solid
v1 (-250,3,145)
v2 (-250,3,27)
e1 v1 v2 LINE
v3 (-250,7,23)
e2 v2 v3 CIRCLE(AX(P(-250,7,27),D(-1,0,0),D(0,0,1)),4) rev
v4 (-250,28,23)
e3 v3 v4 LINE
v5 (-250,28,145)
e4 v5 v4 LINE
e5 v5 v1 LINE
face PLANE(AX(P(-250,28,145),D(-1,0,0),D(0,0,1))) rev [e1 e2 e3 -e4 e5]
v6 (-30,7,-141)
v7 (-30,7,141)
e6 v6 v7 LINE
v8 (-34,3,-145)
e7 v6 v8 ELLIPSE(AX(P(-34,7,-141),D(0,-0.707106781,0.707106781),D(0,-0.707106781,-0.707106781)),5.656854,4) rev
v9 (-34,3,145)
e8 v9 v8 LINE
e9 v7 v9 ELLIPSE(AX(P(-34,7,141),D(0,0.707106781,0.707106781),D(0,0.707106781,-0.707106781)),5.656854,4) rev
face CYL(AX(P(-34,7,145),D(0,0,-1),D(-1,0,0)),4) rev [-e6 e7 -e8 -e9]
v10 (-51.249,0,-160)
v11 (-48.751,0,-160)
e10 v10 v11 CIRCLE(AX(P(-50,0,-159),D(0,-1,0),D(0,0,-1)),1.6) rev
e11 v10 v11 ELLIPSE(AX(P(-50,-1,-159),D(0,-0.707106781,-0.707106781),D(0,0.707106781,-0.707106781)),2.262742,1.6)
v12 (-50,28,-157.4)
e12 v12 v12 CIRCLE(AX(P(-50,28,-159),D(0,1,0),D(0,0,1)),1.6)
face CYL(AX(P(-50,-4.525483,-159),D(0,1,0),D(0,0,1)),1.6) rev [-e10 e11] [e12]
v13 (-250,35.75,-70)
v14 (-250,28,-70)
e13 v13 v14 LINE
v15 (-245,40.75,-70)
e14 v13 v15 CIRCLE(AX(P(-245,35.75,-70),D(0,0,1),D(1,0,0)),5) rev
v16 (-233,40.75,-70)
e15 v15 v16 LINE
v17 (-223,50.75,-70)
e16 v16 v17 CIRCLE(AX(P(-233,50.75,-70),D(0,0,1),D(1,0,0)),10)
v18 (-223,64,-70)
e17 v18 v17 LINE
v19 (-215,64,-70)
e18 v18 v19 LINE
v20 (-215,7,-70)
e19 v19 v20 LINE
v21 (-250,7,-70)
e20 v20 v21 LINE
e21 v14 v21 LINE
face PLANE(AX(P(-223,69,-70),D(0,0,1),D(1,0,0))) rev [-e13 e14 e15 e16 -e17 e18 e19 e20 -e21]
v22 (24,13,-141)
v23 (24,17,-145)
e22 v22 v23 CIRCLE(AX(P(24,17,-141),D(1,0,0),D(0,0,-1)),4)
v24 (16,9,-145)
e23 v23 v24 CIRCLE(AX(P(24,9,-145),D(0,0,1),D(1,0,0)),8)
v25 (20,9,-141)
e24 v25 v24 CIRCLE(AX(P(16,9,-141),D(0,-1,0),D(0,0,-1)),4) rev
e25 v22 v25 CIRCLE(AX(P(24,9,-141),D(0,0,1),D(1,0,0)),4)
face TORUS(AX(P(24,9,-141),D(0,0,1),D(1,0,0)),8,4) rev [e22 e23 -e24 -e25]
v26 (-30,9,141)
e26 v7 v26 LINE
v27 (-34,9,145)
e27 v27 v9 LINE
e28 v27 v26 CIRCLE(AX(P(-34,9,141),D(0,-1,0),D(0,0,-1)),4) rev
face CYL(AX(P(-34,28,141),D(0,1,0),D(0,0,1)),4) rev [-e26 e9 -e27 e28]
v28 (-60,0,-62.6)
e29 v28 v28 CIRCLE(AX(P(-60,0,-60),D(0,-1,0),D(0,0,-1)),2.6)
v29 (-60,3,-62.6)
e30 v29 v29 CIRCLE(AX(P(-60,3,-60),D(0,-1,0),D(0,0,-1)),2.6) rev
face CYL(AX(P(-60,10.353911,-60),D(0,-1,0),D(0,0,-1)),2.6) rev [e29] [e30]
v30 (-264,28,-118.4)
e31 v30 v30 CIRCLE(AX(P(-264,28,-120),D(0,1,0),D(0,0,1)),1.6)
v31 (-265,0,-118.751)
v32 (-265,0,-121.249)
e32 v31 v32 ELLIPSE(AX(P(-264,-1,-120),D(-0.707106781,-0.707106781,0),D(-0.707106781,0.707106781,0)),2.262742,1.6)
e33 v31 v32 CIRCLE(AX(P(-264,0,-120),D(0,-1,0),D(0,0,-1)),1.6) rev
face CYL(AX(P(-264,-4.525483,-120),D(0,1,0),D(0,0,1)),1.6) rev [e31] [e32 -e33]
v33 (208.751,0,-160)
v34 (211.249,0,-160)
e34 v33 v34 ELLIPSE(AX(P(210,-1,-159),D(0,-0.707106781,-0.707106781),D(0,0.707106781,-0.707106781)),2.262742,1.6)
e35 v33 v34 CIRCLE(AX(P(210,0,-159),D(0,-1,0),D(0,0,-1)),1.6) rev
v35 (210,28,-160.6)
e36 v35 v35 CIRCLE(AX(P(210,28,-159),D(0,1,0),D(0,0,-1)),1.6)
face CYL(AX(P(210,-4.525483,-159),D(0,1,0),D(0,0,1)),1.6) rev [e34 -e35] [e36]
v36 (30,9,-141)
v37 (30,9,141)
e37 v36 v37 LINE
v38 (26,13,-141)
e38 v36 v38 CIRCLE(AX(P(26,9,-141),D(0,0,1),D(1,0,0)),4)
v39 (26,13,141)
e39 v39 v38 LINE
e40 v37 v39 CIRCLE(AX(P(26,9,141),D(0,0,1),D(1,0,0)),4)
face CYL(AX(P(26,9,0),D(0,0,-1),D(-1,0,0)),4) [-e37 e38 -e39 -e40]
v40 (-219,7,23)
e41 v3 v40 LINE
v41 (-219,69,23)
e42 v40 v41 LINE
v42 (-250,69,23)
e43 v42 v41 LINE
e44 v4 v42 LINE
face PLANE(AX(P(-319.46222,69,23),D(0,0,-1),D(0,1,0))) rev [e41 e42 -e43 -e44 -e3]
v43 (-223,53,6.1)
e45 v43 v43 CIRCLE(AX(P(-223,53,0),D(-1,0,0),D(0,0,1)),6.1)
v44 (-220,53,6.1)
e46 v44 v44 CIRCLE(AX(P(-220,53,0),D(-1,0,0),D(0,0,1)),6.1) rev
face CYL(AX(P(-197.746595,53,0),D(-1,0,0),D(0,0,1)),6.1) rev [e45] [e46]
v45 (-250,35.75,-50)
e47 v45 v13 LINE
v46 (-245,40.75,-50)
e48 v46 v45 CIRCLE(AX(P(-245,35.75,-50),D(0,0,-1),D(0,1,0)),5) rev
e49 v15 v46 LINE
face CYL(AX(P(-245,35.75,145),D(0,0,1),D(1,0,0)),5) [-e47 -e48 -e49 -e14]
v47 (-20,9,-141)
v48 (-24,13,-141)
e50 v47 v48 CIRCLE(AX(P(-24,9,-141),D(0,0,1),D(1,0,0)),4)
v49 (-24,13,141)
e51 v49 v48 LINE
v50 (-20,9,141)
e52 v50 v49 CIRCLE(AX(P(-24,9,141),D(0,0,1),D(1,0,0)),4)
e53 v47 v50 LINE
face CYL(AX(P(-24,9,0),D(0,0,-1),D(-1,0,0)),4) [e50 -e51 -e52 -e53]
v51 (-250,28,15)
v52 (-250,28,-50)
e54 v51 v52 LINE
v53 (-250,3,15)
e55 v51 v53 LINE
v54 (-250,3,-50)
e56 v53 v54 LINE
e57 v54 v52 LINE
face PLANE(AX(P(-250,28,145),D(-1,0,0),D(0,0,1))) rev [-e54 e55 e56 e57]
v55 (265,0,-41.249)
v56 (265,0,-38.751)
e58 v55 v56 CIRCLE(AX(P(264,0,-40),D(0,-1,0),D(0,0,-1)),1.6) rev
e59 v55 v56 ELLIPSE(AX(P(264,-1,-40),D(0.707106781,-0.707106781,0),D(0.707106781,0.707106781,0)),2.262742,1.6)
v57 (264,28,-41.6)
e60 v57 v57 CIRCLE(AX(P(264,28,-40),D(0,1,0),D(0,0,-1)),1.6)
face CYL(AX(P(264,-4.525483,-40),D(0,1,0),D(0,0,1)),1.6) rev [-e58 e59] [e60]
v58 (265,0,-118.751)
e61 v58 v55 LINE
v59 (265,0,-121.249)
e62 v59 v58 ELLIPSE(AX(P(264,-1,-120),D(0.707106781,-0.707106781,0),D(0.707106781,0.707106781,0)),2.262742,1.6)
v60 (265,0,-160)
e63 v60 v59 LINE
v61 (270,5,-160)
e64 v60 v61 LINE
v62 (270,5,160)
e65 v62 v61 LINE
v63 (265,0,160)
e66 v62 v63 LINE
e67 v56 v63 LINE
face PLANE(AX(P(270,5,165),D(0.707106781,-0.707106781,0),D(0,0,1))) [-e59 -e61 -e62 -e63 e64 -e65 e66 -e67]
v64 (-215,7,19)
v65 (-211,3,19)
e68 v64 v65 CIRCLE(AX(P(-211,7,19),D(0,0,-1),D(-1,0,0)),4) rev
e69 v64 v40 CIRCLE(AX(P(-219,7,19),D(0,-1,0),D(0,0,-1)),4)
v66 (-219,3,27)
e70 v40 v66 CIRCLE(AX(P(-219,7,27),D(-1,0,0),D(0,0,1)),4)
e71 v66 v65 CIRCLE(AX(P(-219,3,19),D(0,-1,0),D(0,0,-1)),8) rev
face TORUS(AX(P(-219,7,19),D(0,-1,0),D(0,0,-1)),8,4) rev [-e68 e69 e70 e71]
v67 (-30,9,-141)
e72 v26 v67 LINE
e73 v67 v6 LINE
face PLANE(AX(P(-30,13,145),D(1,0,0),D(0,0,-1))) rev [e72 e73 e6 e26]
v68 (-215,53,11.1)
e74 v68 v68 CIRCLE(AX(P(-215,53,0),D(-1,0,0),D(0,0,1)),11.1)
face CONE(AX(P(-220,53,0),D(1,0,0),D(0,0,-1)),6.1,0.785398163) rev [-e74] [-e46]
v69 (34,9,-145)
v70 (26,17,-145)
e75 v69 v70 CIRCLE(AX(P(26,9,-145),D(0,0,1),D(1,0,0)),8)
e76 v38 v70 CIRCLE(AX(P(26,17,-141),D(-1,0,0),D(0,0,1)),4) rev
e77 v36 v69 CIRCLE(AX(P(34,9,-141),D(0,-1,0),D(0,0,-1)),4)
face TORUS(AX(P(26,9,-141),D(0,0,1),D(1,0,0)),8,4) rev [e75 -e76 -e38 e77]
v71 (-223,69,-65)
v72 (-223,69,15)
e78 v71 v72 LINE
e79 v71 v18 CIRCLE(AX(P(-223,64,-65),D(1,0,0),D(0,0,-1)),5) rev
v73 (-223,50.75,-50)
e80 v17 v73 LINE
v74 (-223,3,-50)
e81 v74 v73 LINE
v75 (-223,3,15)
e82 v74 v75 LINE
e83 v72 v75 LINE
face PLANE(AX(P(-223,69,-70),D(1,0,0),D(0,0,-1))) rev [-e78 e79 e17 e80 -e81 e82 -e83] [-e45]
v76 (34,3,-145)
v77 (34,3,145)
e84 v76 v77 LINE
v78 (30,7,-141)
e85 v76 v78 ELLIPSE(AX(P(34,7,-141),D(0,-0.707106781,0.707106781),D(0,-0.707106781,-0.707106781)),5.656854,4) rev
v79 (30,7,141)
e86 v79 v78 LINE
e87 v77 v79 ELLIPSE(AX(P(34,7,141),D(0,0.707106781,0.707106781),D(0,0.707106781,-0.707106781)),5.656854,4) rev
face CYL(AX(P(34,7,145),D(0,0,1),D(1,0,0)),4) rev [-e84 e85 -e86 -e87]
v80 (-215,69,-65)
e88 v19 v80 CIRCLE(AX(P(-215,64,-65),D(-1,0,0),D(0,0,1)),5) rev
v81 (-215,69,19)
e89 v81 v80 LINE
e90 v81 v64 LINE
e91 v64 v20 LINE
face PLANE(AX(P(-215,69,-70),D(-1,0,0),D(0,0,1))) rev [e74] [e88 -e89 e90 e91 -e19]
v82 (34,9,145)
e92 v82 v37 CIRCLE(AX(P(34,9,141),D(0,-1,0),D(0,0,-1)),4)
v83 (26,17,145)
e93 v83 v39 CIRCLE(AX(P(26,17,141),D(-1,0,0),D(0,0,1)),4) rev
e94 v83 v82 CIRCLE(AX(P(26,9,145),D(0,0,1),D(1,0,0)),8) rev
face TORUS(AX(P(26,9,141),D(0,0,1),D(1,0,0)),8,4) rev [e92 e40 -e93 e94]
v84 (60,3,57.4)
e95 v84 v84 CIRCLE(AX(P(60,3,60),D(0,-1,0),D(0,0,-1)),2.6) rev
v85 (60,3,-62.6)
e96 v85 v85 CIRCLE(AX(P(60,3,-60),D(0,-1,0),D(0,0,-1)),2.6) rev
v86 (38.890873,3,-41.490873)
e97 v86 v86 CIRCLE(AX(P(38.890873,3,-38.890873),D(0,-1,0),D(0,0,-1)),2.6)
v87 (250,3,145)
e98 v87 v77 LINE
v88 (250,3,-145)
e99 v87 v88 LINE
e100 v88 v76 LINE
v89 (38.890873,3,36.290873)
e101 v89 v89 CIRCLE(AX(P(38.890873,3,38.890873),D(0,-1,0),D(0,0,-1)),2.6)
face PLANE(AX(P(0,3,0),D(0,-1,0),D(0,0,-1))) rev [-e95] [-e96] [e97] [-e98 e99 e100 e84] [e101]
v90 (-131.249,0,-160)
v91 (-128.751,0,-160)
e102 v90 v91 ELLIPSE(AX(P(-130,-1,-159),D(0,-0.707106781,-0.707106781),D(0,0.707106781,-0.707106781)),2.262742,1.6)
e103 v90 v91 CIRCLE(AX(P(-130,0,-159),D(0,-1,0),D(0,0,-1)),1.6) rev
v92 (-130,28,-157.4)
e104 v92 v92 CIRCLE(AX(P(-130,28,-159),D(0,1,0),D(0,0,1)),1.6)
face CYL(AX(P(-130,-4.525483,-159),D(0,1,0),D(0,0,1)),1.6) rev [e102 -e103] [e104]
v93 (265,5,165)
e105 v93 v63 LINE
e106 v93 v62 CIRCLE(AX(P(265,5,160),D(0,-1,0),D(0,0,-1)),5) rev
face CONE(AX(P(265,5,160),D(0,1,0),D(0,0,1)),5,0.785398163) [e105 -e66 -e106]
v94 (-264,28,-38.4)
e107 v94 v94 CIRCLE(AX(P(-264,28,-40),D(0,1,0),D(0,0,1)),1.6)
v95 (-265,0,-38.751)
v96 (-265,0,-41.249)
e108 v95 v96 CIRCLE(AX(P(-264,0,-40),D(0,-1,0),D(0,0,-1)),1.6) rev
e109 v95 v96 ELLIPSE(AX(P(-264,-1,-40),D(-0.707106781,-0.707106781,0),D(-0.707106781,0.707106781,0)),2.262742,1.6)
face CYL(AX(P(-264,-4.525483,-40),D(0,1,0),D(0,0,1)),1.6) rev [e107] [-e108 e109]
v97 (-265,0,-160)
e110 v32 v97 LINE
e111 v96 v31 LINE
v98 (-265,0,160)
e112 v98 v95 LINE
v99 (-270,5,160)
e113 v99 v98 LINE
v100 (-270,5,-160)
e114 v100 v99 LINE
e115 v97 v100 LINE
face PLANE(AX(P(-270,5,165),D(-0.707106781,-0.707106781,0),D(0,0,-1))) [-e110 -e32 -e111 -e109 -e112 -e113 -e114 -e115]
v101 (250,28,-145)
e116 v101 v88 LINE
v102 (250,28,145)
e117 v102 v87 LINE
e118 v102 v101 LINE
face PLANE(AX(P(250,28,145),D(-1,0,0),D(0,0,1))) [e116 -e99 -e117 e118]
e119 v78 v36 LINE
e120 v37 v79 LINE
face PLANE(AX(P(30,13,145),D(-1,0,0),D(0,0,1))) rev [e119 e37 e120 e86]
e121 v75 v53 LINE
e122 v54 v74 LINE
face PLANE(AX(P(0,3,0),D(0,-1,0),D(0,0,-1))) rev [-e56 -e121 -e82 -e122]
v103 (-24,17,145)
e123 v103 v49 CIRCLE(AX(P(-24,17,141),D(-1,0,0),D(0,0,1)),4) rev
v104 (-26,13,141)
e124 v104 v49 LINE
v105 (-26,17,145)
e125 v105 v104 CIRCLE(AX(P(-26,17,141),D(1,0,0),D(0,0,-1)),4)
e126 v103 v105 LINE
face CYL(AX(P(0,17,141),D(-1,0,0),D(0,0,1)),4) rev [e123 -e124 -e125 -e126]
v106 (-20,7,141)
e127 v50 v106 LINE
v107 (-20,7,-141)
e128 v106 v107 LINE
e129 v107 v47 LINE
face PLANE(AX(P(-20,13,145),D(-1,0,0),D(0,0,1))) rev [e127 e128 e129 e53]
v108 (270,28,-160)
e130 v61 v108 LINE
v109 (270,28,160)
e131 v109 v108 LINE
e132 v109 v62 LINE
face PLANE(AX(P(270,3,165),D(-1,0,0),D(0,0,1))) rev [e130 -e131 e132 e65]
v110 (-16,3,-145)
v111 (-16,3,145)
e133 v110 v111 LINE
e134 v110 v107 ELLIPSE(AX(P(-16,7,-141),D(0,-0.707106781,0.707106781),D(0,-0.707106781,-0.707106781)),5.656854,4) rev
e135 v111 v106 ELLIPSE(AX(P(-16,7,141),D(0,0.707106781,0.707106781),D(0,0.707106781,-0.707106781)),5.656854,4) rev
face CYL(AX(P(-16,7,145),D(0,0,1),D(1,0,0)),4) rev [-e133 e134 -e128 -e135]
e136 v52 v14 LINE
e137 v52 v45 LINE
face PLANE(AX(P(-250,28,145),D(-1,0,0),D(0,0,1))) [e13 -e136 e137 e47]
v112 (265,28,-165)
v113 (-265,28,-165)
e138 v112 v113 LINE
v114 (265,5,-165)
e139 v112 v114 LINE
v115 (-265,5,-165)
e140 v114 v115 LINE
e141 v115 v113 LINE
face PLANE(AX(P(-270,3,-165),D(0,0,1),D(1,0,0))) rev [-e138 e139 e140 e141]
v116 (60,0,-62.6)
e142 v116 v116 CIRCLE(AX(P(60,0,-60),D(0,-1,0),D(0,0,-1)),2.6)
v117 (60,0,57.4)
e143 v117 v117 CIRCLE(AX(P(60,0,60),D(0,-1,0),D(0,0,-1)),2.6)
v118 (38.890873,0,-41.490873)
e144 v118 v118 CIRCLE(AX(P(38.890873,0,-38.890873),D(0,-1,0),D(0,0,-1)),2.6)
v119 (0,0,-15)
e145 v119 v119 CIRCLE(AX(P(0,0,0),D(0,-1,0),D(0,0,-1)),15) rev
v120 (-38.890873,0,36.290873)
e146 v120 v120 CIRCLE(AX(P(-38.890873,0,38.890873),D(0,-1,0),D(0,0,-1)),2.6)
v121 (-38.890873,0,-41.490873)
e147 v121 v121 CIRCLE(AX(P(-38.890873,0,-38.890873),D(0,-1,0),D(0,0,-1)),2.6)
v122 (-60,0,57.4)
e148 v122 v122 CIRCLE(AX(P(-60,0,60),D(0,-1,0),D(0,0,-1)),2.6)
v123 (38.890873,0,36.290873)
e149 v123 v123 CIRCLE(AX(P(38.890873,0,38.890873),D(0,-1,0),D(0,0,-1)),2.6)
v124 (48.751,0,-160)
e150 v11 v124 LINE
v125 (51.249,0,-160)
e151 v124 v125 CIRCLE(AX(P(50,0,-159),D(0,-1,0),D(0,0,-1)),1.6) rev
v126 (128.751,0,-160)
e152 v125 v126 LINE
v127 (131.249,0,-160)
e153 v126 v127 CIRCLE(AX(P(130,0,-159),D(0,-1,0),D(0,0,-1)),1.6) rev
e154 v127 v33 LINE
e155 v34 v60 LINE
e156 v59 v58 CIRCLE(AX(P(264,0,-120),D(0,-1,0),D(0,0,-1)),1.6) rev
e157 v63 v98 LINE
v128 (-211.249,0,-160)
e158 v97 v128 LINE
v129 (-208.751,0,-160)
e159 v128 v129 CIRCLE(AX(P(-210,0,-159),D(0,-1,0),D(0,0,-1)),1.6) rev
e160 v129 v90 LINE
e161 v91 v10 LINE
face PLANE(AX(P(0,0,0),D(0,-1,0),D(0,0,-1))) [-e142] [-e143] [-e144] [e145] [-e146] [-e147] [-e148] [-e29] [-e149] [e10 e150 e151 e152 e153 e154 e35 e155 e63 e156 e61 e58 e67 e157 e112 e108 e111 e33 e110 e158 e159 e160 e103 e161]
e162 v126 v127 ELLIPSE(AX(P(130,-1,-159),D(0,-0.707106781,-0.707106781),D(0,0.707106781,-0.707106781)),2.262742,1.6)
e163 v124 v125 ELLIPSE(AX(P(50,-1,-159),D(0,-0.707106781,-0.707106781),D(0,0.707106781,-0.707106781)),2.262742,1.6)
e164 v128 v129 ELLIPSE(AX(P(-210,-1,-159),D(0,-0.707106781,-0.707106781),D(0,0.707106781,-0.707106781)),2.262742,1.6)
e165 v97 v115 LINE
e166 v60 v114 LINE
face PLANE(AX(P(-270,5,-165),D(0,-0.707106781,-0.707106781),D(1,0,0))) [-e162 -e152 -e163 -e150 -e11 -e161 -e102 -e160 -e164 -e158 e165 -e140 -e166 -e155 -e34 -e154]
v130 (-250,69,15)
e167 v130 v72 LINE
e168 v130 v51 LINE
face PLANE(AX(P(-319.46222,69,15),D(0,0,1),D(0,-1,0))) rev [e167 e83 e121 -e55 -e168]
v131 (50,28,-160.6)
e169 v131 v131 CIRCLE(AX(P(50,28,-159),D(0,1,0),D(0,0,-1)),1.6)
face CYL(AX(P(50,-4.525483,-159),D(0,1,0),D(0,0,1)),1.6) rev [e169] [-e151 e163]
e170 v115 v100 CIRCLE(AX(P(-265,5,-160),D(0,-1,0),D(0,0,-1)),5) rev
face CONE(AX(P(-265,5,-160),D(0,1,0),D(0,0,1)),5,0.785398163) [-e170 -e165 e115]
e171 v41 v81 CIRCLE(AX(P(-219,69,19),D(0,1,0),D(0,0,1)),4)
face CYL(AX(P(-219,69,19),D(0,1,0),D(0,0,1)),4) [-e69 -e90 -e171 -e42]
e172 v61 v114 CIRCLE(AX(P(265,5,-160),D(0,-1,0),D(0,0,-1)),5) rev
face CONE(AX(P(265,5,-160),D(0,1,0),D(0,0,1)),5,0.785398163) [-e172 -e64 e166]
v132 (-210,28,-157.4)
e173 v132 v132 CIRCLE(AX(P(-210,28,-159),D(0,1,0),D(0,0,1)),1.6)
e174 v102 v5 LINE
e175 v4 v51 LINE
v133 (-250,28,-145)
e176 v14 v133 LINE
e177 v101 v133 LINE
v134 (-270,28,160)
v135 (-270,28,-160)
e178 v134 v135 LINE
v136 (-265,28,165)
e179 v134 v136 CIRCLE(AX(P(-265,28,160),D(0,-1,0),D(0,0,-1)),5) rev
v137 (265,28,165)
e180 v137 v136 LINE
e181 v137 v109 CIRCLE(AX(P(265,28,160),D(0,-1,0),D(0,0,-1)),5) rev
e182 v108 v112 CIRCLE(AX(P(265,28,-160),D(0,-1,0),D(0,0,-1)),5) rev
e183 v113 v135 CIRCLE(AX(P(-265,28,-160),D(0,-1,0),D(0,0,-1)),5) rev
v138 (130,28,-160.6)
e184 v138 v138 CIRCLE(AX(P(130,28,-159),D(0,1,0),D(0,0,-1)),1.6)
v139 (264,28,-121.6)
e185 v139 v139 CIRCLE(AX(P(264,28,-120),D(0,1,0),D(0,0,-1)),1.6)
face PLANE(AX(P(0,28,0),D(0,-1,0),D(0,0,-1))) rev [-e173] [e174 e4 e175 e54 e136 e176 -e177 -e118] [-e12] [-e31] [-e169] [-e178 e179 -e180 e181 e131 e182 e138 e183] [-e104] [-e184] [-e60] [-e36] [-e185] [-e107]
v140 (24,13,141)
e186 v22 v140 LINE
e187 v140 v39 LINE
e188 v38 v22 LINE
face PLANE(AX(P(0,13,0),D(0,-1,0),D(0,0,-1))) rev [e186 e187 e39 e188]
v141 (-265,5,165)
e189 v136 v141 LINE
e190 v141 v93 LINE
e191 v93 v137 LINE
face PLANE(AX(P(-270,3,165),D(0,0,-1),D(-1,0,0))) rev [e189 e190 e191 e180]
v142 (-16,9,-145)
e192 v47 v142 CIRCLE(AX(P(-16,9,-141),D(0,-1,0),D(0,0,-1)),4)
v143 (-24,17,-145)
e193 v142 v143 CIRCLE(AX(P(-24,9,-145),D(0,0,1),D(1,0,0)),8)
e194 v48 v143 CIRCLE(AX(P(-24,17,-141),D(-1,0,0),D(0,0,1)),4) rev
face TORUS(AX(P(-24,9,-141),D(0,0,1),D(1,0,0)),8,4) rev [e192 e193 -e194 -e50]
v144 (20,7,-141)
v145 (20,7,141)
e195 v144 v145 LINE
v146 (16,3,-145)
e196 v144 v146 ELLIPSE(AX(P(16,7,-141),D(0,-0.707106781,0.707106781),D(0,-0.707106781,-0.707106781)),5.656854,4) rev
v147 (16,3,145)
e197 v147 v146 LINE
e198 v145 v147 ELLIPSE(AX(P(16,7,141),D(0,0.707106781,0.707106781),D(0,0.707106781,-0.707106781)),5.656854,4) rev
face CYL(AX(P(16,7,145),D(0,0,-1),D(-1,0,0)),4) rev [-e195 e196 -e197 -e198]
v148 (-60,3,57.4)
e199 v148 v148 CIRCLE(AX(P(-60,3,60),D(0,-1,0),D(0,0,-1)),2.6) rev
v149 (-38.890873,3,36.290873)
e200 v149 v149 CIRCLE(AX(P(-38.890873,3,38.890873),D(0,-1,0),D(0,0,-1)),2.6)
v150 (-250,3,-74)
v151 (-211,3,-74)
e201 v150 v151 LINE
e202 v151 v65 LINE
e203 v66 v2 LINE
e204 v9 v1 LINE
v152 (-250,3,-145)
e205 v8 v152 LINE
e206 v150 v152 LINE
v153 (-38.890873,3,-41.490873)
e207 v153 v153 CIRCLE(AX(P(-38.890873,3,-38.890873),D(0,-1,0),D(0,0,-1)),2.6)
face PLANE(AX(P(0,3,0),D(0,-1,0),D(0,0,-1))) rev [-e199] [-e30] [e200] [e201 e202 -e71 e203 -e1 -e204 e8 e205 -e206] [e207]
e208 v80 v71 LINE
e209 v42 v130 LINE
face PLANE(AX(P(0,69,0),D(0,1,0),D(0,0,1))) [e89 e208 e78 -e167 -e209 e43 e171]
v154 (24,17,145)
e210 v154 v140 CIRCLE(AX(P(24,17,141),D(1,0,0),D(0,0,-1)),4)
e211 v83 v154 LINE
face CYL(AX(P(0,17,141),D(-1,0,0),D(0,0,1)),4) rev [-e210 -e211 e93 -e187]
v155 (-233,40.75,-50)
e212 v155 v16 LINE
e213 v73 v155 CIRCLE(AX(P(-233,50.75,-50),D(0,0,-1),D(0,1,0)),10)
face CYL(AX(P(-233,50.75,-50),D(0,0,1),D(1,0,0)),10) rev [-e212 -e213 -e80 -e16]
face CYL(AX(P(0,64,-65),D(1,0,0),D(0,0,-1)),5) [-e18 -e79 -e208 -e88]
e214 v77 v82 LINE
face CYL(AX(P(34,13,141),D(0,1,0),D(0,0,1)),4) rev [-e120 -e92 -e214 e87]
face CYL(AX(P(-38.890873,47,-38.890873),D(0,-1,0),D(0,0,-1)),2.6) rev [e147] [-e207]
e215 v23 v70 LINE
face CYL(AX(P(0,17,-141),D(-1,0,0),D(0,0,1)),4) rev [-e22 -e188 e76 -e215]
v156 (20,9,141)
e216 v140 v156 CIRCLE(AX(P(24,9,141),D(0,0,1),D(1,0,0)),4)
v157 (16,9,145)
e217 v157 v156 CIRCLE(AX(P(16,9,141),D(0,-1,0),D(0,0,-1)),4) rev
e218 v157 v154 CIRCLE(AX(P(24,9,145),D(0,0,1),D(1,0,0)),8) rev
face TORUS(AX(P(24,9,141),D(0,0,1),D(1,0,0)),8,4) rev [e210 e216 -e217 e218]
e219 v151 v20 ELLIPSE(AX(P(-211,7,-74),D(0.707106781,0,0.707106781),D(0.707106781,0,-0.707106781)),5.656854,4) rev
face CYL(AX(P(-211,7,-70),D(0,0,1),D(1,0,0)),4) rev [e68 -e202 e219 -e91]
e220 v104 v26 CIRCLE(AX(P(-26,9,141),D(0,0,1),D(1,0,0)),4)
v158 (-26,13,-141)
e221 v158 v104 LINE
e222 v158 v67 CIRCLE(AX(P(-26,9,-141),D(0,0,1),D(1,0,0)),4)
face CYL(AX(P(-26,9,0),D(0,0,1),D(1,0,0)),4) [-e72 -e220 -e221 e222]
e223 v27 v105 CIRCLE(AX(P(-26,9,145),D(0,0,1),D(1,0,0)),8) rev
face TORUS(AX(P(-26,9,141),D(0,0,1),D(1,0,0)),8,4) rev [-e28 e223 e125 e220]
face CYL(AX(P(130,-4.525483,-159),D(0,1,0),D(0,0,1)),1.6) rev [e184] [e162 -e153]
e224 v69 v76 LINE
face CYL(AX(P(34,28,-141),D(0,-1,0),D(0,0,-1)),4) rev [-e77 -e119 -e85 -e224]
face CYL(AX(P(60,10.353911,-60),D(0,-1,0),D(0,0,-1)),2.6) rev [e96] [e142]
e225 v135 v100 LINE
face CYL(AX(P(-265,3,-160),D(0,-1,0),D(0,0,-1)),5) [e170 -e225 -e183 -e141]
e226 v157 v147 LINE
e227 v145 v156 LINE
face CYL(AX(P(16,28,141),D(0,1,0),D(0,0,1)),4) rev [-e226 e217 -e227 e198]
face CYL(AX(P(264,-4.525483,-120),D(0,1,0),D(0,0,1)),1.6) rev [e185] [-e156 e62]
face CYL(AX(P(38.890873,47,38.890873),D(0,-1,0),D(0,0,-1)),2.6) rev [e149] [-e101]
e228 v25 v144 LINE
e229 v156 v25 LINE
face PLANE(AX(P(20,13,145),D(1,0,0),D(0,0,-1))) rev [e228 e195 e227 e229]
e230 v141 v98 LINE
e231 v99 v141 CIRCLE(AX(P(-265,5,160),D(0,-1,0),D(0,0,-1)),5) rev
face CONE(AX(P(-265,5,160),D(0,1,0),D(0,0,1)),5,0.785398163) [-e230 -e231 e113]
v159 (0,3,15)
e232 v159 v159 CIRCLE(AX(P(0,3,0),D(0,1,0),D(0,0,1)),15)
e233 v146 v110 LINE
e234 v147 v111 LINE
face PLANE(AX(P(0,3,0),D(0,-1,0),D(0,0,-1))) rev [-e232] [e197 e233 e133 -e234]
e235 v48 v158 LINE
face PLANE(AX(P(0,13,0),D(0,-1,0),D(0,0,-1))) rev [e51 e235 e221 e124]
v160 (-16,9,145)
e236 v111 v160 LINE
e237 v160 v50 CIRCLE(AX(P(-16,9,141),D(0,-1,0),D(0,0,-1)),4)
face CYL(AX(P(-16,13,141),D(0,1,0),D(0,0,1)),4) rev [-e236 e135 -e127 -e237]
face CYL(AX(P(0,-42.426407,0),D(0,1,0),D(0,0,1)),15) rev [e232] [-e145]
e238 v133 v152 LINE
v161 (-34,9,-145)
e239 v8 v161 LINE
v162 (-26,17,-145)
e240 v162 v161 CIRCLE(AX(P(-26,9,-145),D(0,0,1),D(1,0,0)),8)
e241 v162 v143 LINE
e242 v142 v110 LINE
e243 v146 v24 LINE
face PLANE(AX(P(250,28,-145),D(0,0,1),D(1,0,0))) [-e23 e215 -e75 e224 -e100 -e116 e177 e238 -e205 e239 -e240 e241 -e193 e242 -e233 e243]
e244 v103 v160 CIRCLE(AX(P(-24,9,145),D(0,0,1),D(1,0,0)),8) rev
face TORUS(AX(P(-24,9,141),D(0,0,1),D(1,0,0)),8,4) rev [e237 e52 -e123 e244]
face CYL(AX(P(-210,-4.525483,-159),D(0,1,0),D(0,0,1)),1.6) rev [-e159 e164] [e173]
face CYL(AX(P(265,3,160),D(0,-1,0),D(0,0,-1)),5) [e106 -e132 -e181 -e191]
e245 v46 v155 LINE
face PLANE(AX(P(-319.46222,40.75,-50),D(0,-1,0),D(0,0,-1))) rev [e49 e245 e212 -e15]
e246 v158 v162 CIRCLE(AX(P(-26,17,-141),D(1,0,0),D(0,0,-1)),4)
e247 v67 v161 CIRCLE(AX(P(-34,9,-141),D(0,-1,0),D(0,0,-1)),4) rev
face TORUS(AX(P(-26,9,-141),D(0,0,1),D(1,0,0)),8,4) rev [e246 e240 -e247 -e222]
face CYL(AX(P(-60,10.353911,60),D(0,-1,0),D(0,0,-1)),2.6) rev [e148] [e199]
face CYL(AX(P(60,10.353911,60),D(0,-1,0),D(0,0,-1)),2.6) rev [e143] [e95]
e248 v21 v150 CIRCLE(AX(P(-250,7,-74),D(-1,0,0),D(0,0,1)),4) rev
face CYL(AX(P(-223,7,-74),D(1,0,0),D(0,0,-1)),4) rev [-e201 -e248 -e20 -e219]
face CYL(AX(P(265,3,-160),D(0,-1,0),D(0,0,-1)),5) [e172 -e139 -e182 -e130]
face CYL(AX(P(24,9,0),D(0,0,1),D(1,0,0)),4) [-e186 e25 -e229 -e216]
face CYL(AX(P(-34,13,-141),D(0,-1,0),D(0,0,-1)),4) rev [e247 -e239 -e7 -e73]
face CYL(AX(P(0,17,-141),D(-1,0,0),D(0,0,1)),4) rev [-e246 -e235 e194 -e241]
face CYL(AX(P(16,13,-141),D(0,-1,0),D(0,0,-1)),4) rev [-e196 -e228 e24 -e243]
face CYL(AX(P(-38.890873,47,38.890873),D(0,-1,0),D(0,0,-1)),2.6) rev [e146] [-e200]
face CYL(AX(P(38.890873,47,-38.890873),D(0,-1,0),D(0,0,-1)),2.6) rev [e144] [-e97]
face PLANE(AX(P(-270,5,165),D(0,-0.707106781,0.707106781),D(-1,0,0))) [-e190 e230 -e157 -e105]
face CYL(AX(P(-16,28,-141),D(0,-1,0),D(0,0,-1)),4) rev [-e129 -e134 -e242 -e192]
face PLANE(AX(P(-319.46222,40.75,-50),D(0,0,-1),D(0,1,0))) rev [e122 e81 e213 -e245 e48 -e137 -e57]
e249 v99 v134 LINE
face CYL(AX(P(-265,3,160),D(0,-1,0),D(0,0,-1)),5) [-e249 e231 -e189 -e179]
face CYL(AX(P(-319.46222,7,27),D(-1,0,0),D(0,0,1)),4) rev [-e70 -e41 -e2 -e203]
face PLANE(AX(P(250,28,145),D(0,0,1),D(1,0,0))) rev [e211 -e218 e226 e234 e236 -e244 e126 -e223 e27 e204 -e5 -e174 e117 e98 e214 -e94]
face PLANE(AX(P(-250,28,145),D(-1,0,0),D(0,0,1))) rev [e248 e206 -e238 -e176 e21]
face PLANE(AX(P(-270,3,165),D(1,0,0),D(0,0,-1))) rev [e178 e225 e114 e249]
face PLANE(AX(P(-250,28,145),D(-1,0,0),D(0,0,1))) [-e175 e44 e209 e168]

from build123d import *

# Parameters (mm, degrees)
SKETCH1_W           = 540
SKETCH1_H           = 330
BOSS_EXTRUDE1_DEPTH = 3
SKETCH2_W           = 540
SKETCH2_H           = 330
SKETCH2_W_2         = 500
SKETCH2_H_2         = 290
BOSS_EXTRUDE2_DEPTH = 25
FILLET1_R           = 5
SKETCH4_R           = 1.6
CUT_EXTRUDE1_DEPTH  = 28
SKETCH5_R           = 15
CUT_EXTRUDE2_DEPTH  = 3
SKETCH6_W           = 10
SKETCH6_H           = 290
BOSS_EXTRUDE3_DEPTH = 10
FILLET3_R           = 4
CHAMFER1_SIZE       = 5
SKETCH7_R           = 2.6
CUT_EXTRUDE3_DEPTH  = 3
SKETCH9_R           = 2.6
CUT_EXTRUDE4_DEPTH  = 47
SKETCH11_W          = 8
SKETCH11_H          = 140
BOSS_EXTRUDE4_DEPTH = 66
SKETCH12_R          = 6.1
CUT_EXTRUDE5_DEPTH  = 8
SKETCH13_W          = 8
SKETCH13_H          = 69
SKETCH13_W_2        = 20
SKETCH13_H_2        = 40.75
BOSS_EXTRUDE5_DEPTH = 27
SKETCH15_W          = 8
SKETCH15_H          = 47
CUT_EXTRUDE6_DEPTH  = 66
FILLET4_R           = 4
FILLET5_R           = 10
FILLET6_R           = 5
FILLET7_R           = 5
CHAMFER2_SIZE       = 5


with BuildPart() as part:
    # Sketch1 → Boss-Extrude1 (new body)
    with BuildSketch(Plane(origin=(0, 0, 0), x_dir=(1, 0, 0), z_dir=(0, 1, 0))):
        Rectangle(SKETCH1_W, SKETCH1_H)
    extrude(amount=BOSS_EXTRUDE1_DEPTH)

    # Sketch2 → Boss-Extrude2 (add)
    with BuildSketch(Plane(origin=(0, 3, 0), x_dir=(1, 0, 0), z_dir=(0, 1, 0))):
        Rectangle(SKETCH2_W, SKETCH2_H)
        Rectangle(SKETCH2_W_2, SKETCH2_H_2, mode=Mode.SUBTRACT)
    extrude(amount=BOSS_EXTRUDE2_DEPTH)

    # Fillet1
    fillet1_edges = [part.edges().sort_by_distance(p)[0] for p in [
        (270, 14, 165),
        (-270, 14, 165),
        (-270, 14, -165),
        (270, 14, -165),
    ]]
    fillet(fillet1_edges, radius=FILLET1_R)

    # Sketch4 → Cut-Extrude1 (cut)
    with BuildSketch(Plane(origin=(0, 28, 0), x_dir=(1, 0, 0), z_dir=(0, 1, 0))):
        with Locations(Location((-264, 120, 0), (0, 0, 270))):
            Circle(SKETCH4_R)
        with Locations(Location((-264, 40, 0), (0, 0, 270))):
            Circle(SKETCH4_R)
        with Locations(Location((-210, 159, 0), (0, 0, 270))):
            Circle(SKETCH4_R)
        with Locations(Location((-130, 159, 0), (0, 0, 270))):
            Circle(SKETCH4_R)
        with Locations(Location((-50, 159, 0), (0, 0, 270))):
            Circle(SKETCH4_R)
        with Locations(Location((50, 159, 0), (0, 0, 90))):
            Circle(SKETCH4_R)
        with Locations(Location((130, 159, 0), (0, 0, 90))):
            Circle(SKETCH4_R)
        with Locations(Location((210, 159, 0), (0, 0, 90))):
            Circle(SKETCH4_R)
        with Locations(Location((264, 40, 0), (0, 0, 90))):
            Circle(SKETCH4_R)
        with Locations(Location((264, 120, 0), (0, 0, 90))):
            Circle(SKETCH4_R)
    extrude(amount=-CUT_EXTRUDE1_DEPTH, mode=Mode.SUBTRACT)

    # Sketch5 → Cut-Extrude2 (cut)
    with BuildSketch(Plane(origin=(0, 3, 0), x_dir=(1, 0, 0), z_dir=(0, 1, 0))):
        with Locations(Location((0, 0, 0), (0, 0, 270))):
            Circle(SKETCH5_R)
    extrude(amount=-CUT_EXTRUDE2_DEPTH, mode=Mode.SUBTRACT)

    # Sketch6 → Boss-Extrude3 (add)
    with BuildSketch(Plane(origin=(0, 3, 0), x_dir=(1, 0, 0), z_dir=(0, 1, 0))):
        with Locations((25, 0)):
            Rectangle(SKETCH6_W, SKETCH6_H)
        with Locations((-25, 0)):
            Rectangle(SKETCH6_W, SKETCH6_H)
    extrude(amount=BOSS_EXTRUDE3_DEPTH)

    # Fillet3
    fillet3_edges = [part.edges().sort_by_distance(p)[0] for p in [
        (30, 3, 0),
        (30, 8, 145),
        (30, 8, -145),
        (20, 3, 0),
        (20, 8, -145),
        (20, 8, 145),
        (30, 13, 0),
        (25, 13, -145),
        (20, 13, 0),
        (25, 13, 145),
        (-20, 3, 0),
        (-20, 8, 145),
        (-20, 8, -145),
        (-30, 3, 0),
        (-30, 8, -145),
        (-30, 8, 145),
        (-20, 13, 0),
        (-25, 13, -145),
        (-30, 13, 0),
        (-25, 13, 145),
    ]]
    fillet(fillet3_edges, radius=FILLET3_R)

    # Chamfer1
    # the kernel refuses this chamfer: 5 mm, written as the material it takes off along each edge
    with BuildSketch(Plane(origin=(-270, 0, -160), x_dir=(0, 1, 0), z_dir=(0, 0, 1)), Plane(origin=(270, 0, 160), x_dir=(0, 1, 0), z_dir=(0, 0, -1))) as chamfer1_piece_1:
        Polygon((CHAMFER1_SIZE, 0), (0, -CHAMFER1_SIZE), (0, 0), align=None)
    extrude(amount=320, mode=Mode.SUBTRACT)
    with BuildSketch(Plane(origin=(-265, 0, 165), x_dir=(0, 1, 0), z_dir=(1, 0, 0)), Plane(origin=(265, 0, -165), x_dir=(0, 1, 0), z_dir=(-1, 0, 0))) as chamfer1_piece_2:
        Polygon((CHAMFER1_SIZE, 0), (0, -CHAMFER1_SIZE), (0, 0), align=None)
    extrude(amount=530, mode=Mode.SUBTRACT)
    with BuildSketch(Plane(origin=(265, 0, -160), x_dir=(0, 0, -1), z_dir=(-1, 0, 0))) as chamfer1_piece_3:
        Polygon((5, -CHAMFER1_SIZE), (5 - CHAMFER1_SIZE, 0), (5, 0), align=None)
    revolve(axis=Axis((265, 0, -160), (0, -1, 0)), revolution_arc=90, mode=Mode.SUBTRACT)
    with BuildSketch(Plane(origin=(265, 0, 160), x_dir=(0, 0, 1), z_dir=(-1, 0, 0))) as chamfer1_piece_4:
        Polygon((5, CHAMFER1_SIZE), (5 - CHAMFER1_SIZE, 0), (5, 0), align=None)
    revolve(axis=Axis((265, 0, 160), (0, 1, 0)), revolution_arc=90, mode=Mode.SUBTRACT)
    with BuildSketch(Plane(origin=(-265, 0, 160), x_dir=(0, 0, 1), z_dir=(1, 0, 0))) as chamfer1_piece_5:
        Polygon((5, -CHAMFER1_SIZE), (5 - CHAMFER1_SIZE, 0), (5, 0), align=None)
    revolve(axis=Axis((-265, 0, 160), (0, -1, 0)), revolution_arc=90, mode=Mode.SUBTRACT)
    with BuildSketch(Plane(origin=(-265, 0, -160), x_dir=(0, 0, -1), z_dir=(1, 0, 0))) as chamfer1_piece_6:
        Polygon((5, CHAMFER1_SIZE), (5 - CHAMFER1_SIZE, 0), (5, 0), align=None)
    revolve(axis=Axis((-265, 0, -160), (0, 1, 0)), revolution_arc=90, mode=Mode.SUBTRACT)

    # Sketch7 → Cut-Extrude3 (cut)
    with BuildSketch(Plane.XZ):
        with Locations(Location((-60, 60, 0), (0, 0, 270))):
            Circle(SKETCH7_R)
        with Locations(Location((60, 60, 0), (0, 0, 270))):
            Circle(SKETCH7_R)
        with Locations(Location((60, -60, 0), (0, 0, 270))):
            Circle(SKETCH7_R)
        with Locations(Location((-60, -60, 0), (0, 0, 270))):
            Circle(SKETCH7_R)
    extrude(amount=-CUT_EXTRUDE3_DEPTH, mode=Mode.SUBTRACT)

    # Sketch9 → Cut-Extrude4 (cut)
    with BuildSketch(Plane.XZ):
        with Locations(Location((-38.890872965, 38.890872965, 0), (0, 0, 270))):
            Circle(SKETCH9_R)
        with Locations(Location((38.890872965, 38.890872965, 0), (0, 0, 270))):
            Circle(SKETCH9_R)
        with Locations(Location((38.890872965, -38.890872965, 0), (0, 0, 270))):
            Circle(SKETCH9_R)
        with Locations(Location((-38.890872965, -38.890872965, 0), (0, 0, 270))):
            Circle(SKETCH9_R)
    extrude(amount=-CUT_EXTRUDE4_DEPTH, mode=Mode.SUBTRACT)

    # Sketch11 → Boss-Extrude4 (add)
    with BuildSketch(Plane(origin=(0, 3, 0), x_dir=(1, 0, 0), z_dir=(0, 1, 0))):
        with Locations((-219, 0)):
            Rectangle(SKETCH11_W, SKETCH11_H)
    extrude(amount=BOSS_EXTRUDE4_DEPTH)

    # Sketch12 → Cut-Extrude5 (cut)
    with BuildSketch(Plane.ZY.offset(223)):
        with Locations((0, 53)):
            Circle(SKETCH12_R)
    extrude(amount=-CUT_EXTRUDE5_DEPTH, mode=Mode.SUBTRACT)

    # Sketch13 → Boss-Extrude5 (add)
    with BuildSketch(Plane.ZY.offset(223)):
        with Locations((19, 34.5)):
            Rectangle(SKETCH13_W, SKETCH13_H)
        with Locations((-60, 20.375)):
            Rectangle(SKETCH13_W_2, SKETCH13_H_2)
    extrude(amount=BOSS_EXTRUDE5_DEPTH)

    # Sketch15 → Cut-Extrude6 (cut)
    with BuildSketch(Plane(origin=(0, 69, 0), x_dir=(1, 0, 0), z_dir=(0, 1, 0))):
        with Locations((-219, -46.5)):
            Rectangle(SKETCH15_W, SKETCH15_H)
    extrude(amount=-CUT_EXTRUDE6_DEPTH, mode=Mode.SUBTRACT)

    # Fillet4
    fillet4_edges = [part.edges().sort_by_distance(p)[0] for p in [
        (-232.5, 3, -70),
        (-232.5, 3, 23),
        (-215, 3, -23.5),
        (-215, 36, 23),
    ]]
    fillet(fillet4_edges, radius=FILLET4_R)

    # Fillet5
    fillet5_edges = [part.edges().sort_by_distance(p)[0] for p in [
        (-223, 40.75, -60),
    ]]
    fillet(fillet5_edges, radius=FILLET5_R)

    # Fillet6
    fillet6_edges = [part.edges().sort_by_distance(p)[0] for p in [
        (-250, 40.75, -60),
    ]]
    fillet(fillet6_edges, radius=FILLET6_R)

    # Fillet7
    fillet7_edges = [part.edges().sort_by_distance(p)[0] for p in [
        (-219, 69, -70),
    ]]
    fillet(fillet7_edges, radius=FILLET7_R)

    # Chamfer2
    chamfer2_edges = [part.edges().sort_by_distance(p)[0] for p in [
        (-215, 53, -6.1),
    ]]
    chamfer(chamfer2_edges, length=CHAMFER2_SIZE)


solid = part.part
